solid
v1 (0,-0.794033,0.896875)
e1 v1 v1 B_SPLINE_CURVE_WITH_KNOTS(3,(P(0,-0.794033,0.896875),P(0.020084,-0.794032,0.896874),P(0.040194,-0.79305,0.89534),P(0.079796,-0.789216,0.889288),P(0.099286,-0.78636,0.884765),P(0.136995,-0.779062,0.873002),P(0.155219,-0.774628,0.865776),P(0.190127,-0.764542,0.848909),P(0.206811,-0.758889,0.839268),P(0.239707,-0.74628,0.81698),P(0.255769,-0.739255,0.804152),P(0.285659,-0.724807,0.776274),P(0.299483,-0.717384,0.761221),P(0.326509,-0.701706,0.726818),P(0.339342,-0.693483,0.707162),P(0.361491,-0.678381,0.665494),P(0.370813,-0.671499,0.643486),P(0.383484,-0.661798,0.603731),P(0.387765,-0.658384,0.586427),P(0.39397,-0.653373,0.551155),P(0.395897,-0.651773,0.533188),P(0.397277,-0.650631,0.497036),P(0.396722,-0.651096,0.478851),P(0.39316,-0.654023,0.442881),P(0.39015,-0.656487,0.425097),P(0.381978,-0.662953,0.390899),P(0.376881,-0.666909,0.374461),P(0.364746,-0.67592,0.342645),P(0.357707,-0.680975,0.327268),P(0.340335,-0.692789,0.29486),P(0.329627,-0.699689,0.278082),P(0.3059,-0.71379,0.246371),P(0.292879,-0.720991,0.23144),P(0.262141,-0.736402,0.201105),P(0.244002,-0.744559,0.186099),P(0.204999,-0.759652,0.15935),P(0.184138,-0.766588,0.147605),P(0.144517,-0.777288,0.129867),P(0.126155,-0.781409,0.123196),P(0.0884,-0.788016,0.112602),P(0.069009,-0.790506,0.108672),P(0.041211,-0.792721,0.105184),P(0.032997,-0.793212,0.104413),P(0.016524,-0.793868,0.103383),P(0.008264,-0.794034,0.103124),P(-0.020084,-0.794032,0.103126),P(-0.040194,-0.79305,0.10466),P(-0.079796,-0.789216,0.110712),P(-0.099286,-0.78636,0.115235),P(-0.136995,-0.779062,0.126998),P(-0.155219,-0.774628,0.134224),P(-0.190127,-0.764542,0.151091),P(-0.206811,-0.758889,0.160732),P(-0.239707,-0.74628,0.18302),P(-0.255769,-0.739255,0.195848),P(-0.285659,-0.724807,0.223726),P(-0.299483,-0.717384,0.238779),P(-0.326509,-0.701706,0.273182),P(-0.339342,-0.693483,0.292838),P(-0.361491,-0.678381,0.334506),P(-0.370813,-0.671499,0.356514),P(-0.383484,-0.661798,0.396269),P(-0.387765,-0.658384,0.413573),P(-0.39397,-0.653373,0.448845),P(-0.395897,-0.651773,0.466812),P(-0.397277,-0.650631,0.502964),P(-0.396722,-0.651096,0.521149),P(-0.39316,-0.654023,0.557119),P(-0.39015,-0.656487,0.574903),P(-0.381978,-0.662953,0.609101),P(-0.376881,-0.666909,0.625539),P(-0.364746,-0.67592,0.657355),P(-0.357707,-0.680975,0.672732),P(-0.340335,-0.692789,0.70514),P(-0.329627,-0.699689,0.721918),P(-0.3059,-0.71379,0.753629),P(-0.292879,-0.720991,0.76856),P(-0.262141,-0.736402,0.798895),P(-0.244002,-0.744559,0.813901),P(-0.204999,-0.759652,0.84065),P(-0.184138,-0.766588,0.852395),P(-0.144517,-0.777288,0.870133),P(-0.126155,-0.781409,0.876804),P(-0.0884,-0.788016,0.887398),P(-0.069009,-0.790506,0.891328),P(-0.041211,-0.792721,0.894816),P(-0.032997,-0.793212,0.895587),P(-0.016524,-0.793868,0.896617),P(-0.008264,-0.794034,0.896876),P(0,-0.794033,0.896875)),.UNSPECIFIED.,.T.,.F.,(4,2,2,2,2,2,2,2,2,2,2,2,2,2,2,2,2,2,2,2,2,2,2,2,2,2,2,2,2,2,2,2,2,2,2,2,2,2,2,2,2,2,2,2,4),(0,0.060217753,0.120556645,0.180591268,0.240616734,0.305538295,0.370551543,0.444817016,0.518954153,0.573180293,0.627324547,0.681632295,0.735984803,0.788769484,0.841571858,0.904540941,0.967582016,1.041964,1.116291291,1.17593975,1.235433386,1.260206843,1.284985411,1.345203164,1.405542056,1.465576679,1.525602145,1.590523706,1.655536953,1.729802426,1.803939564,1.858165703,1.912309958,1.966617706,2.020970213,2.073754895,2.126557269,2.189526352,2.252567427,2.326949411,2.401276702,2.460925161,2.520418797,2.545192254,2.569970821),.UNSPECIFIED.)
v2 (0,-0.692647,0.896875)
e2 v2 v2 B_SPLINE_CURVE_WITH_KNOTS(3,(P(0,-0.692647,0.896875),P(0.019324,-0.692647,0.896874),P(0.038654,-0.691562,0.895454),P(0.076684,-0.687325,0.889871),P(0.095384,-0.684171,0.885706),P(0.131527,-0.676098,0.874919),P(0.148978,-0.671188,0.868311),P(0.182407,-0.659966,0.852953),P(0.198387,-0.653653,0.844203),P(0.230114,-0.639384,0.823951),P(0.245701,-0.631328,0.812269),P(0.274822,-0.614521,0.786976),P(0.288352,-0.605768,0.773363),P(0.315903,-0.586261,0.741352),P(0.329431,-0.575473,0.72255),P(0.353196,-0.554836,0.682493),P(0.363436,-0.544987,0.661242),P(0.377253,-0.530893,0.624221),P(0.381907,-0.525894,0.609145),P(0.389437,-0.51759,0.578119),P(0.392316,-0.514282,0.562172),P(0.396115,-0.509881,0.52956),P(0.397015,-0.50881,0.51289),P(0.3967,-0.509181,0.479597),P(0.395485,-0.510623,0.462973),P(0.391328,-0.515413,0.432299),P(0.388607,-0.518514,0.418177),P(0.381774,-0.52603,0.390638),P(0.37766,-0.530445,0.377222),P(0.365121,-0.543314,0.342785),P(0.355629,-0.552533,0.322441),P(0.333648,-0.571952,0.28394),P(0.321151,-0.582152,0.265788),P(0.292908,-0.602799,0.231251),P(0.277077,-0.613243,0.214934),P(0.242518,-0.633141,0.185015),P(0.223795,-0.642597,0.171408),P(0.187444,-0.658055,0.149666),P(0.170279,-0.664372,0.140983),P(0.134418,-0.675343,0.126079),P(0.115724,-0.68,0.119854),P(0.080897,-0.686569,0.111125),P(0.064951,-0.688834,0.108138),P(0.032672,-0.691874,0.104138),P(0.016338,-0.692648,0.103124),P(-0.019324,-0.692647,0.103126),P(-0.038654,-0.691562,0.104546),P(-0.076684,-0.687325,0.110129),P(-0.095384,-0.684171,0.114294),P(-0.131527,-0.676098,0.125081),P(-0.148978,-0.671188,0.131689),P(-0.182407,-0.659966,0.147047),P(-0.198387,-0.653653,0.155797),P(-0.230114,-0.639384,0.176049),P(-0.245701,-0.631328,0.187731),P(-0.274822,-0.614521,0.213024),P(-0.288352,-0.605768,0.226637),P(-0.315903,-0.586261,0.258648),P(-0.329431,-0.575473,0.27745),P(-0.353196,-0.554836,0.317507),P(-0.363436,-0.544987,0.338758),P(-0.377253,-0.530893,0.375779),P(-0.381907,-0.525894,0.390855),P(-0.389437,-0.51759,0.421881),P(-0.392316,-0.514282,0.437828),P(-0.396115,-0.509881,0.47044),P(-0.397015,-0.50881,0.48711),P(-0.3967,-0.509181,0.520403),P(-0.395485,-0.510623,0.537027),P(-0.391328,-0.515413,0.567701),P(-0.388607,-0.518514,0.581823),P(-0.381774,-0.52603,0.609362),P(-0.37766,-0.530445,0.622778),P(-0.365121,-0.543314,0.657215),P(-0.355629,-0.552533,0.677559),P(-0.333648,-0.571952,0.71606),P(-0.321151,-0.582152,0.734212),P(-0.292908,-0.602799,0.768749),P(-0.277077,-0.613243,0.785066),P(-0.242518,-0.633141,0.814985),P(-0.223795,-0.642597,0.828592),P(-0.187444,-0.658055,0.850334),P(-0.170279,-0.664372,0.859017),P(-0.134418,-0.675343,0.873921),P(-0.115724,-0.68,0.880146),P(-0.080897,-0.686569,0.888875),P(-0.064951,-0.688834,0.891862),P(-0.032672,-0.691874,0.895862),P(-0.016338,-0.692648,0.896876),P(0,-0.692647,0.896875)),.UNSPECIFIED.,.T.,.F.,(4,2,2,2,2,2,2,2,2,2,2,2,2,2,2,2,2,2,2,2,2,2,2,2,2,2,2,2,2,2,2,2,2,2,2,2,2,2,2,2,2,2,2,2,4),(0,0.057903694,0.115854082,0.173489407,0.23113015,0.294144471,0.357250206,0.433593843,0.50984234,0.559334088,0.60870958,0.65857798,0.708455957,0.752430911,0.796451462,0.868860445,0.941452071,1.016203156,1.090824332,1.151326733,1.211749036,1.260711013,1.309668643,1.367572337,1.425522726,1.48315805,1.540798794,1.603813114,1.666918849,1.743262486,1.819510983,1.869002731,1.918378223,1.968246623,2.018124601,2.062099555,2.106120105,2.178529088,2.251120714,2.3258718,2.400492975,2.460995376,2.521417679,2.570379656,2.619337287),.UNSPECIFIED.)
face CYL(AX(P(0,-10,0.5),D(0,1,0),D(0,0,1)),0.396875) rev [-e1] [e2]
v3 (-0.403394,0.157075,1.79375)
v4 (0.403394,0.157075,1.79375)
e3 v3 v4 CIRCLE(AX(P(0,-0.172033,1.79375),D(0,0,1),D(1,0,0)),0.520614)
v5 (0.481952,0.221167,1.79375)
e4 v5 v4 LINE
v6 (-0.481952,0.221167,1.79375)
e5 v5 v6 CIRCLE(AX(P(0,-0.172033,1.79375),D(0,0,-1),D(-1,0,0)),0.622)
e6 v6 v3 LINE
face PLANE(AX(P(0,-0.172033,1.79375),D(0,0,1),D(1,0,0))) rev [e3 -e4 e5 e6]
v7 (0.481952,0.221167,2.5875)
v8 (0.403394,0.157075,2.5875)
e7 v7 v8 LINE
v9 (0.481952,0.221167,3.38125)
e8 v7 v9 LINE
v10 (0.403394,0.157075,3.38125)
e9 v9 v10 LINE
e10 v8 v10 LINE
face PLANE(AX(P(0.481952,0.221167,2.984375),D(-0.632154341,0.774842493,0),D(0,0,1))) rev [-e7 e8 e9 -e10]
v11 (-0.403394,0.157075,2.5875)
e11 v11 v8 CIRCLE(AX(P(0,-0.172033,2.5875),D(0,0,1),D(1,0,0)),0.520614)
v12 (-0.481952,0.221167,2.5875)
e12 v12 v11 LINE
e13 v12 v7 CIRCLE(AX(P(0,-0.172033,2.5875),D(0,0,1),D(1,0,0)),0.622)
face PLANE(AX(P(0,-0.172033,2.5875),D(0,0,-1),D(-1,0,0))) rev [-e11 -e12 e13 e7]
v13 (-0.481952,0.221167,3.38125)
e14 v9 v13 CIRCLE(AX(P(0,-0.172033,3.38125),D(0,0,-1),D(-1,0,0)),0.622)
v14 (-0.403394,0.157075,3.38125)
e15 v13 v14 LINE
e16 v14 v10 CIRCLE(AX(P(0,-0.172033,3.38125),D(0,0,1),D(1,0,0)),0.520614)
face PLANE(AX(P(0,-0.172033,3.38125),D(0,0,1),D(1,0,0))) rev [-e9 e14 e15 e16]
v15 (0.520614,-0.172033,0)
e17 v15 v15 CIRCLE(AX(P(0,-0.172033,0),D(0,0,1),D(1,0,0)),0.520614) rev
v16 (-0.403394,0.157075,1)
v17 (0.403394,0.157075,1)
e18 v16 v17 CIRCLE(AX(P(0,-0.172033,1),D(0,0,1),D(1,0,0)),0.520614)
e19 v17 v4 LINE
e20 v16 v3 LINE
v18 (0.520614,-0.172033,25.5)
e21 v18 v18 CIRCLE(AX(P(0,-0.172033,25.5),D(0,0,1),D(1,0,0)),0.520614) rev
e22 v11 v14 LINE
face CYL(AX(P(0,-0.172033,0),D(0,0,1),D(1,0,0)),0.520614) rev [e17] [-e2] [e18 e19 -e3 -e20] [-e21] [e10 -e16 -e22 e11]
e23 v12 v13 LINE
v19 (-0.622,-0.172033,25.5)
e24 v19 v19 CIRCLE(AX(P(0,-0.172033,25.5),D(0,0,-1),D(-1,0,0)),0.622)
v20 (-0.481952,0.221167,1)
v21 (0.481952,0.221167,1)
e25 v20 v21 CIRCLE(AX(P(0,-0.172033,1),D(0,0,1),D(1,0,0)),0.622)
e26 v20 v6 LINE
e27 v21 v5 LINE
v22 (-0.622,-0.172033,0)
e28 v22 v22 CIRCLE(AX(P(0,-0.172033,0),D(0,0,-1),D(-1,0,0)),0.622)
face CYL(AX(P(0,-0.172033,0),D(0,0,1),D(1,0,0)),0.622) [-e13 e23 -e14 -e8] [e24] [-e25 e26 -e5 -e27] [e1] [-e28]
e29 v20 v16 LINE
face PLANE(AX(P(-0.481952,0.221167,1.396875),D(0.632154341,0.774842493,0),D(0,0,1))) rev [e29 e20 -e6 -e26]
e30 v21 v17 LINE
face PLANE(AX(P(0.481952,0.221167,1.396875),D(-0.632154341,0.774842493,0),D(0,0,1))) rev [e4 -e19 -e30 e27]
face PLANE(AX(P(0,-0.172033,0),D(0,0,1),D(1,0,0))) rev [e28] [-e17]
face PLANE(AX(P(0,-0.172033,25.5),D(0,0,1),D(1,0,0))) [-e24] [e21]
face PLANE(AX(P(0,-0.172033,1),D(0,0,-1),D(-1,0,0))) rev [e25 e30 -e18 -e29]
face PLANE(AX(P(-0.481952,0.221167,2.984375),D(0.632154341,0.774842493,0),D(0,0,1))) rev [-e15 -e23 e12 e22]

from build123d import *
from build123d.topology import SkipClean

# Parameters (mm, degrees)
THICKEN1_START     = 3.38125
THICKEN1_DEPTH     = 22.11875
THICKEN1_2_DEPTH   = 1
THICKEN1_START_2   = 1.79375
THICKEN1_3_DEPTH   = 0.79375
THICKEN1_START_3   = 1
THICKEN1_4_DEPTH   = 2.38125
SKETCH7_R          = 0.396875
CUT_EXTRUDE1_DEPTH = 10


with BuildPart() as part:
    # Thicken1: read off the stored shape, not the designer's step
    # Thicken1 outline → Thicken1 (new body)
    with BuildSketch(Plane.XY.offset(THICKEN1_START)):
        with BuildLine():
            ThreePointArc((0, -0.794033341), (0.622, -0.172033341), (0, 0.449966659))
            Line((0, 0.449966659), (0, 0.348580659))
            ThreePointArc((0, 0.348580659), (0.520614, -0.172033341), (0, -0.692647341))
            Line((0, -0.692647341), (0, -0.794033341))
        make_face()
    extrude(amount=THICKEN1_DEPTH)



with BuildPart() as body_2:
    # Thicken1 2 outline → Thicken1 2 (new body)
    with BuildSketch(Plane.XY):
        with BuildLine():
            ThreePointArc((0, -0.794033341), (0.622, -0.172033341), (0, 0.449966659))
            Line((0, 0.449966659), (0, 0.348580659))
            ThreePointArc((0, 0.348580659), (0.520614, -0.172033341), (0, -0.692647341))
            Line((0, -0.692647341), (0, -0.794033341))
        make_face()
    extrude(amount=THICKEN1_2_DEPTH)


with BuildPart() as body_3:
    # Thicken1 3 outline → Thicken1 3 (new body)
    with BuildSketch(Plane.XY.offset(THICKEN1_START_2)):
        with BuildLine():
            ThreePointArc((0, -0.794033341), (0.622, -0.172033341), (0, 0.449966659))
            Line((0, 0.449966659), (0, 0.348580659))
            ThreePointArc((0, 0.348580659), (0.520614, -0.172033341), (0, -0.692647341))
            Line((0, -0.692647341), (0, -0.794033341))
        make_face()
    extrude(amount=THICKEN1_3_DEPTH)


with BuildPart() as part_1:
    add(part.part)

    add(body_2.part)  # Thicken1 4 merges body 2

    add(body_3.part)  # Thicken1 4 merges body 3
    # Thicken1 4 outline → Thicken1 4 (add)
    with BuildSketch(Plane.XY.offset(THICKEN1_START_3)):
        with BuildLine():
            Line((0.40339385, 0.157075059), (0.481952031, 0.221166659))
            ThreePointArc((0.481952031, 0.221166659), (0.26675232, 0.389862735), (0, 0.449966659))
            Line((0, 0.449966659), (0, 0.348580659))
            ThreePointArc((0, 0.348580659), (0.223271692, 0.298273674), (0.40339385, 0.157075059))
        make_face()
    extrude(amount=THICKEN1_4_DEPTH)

    # Sketch7 → Cut-Extrude1 (cut)
    with BuildSketch(Plane(origin=(0, 0, 0), x_dir=(1, 0, 0), z_dir=(0, 1, 0))):
        with Locations((0, -0.5)):
            Circle(SKETCH7_R)
    extrude(amount=-CUT_EXTRUDE1_DEPTH, mode=Mode.SUBTRACT)

    # Mirror2: part across face


with BuildPart() as part_2:
    with SkipClean():  # the faces are left unmerged after this step: merging them gives an invalid solid
        add(part_1.part)
        add(part_1.part.mirror(Plane(origin=(0, 0.399273659, 12.75), x_dir=(0, 0, 1), z_dir=(-1, 0, 0))))


solid = part_2.part
